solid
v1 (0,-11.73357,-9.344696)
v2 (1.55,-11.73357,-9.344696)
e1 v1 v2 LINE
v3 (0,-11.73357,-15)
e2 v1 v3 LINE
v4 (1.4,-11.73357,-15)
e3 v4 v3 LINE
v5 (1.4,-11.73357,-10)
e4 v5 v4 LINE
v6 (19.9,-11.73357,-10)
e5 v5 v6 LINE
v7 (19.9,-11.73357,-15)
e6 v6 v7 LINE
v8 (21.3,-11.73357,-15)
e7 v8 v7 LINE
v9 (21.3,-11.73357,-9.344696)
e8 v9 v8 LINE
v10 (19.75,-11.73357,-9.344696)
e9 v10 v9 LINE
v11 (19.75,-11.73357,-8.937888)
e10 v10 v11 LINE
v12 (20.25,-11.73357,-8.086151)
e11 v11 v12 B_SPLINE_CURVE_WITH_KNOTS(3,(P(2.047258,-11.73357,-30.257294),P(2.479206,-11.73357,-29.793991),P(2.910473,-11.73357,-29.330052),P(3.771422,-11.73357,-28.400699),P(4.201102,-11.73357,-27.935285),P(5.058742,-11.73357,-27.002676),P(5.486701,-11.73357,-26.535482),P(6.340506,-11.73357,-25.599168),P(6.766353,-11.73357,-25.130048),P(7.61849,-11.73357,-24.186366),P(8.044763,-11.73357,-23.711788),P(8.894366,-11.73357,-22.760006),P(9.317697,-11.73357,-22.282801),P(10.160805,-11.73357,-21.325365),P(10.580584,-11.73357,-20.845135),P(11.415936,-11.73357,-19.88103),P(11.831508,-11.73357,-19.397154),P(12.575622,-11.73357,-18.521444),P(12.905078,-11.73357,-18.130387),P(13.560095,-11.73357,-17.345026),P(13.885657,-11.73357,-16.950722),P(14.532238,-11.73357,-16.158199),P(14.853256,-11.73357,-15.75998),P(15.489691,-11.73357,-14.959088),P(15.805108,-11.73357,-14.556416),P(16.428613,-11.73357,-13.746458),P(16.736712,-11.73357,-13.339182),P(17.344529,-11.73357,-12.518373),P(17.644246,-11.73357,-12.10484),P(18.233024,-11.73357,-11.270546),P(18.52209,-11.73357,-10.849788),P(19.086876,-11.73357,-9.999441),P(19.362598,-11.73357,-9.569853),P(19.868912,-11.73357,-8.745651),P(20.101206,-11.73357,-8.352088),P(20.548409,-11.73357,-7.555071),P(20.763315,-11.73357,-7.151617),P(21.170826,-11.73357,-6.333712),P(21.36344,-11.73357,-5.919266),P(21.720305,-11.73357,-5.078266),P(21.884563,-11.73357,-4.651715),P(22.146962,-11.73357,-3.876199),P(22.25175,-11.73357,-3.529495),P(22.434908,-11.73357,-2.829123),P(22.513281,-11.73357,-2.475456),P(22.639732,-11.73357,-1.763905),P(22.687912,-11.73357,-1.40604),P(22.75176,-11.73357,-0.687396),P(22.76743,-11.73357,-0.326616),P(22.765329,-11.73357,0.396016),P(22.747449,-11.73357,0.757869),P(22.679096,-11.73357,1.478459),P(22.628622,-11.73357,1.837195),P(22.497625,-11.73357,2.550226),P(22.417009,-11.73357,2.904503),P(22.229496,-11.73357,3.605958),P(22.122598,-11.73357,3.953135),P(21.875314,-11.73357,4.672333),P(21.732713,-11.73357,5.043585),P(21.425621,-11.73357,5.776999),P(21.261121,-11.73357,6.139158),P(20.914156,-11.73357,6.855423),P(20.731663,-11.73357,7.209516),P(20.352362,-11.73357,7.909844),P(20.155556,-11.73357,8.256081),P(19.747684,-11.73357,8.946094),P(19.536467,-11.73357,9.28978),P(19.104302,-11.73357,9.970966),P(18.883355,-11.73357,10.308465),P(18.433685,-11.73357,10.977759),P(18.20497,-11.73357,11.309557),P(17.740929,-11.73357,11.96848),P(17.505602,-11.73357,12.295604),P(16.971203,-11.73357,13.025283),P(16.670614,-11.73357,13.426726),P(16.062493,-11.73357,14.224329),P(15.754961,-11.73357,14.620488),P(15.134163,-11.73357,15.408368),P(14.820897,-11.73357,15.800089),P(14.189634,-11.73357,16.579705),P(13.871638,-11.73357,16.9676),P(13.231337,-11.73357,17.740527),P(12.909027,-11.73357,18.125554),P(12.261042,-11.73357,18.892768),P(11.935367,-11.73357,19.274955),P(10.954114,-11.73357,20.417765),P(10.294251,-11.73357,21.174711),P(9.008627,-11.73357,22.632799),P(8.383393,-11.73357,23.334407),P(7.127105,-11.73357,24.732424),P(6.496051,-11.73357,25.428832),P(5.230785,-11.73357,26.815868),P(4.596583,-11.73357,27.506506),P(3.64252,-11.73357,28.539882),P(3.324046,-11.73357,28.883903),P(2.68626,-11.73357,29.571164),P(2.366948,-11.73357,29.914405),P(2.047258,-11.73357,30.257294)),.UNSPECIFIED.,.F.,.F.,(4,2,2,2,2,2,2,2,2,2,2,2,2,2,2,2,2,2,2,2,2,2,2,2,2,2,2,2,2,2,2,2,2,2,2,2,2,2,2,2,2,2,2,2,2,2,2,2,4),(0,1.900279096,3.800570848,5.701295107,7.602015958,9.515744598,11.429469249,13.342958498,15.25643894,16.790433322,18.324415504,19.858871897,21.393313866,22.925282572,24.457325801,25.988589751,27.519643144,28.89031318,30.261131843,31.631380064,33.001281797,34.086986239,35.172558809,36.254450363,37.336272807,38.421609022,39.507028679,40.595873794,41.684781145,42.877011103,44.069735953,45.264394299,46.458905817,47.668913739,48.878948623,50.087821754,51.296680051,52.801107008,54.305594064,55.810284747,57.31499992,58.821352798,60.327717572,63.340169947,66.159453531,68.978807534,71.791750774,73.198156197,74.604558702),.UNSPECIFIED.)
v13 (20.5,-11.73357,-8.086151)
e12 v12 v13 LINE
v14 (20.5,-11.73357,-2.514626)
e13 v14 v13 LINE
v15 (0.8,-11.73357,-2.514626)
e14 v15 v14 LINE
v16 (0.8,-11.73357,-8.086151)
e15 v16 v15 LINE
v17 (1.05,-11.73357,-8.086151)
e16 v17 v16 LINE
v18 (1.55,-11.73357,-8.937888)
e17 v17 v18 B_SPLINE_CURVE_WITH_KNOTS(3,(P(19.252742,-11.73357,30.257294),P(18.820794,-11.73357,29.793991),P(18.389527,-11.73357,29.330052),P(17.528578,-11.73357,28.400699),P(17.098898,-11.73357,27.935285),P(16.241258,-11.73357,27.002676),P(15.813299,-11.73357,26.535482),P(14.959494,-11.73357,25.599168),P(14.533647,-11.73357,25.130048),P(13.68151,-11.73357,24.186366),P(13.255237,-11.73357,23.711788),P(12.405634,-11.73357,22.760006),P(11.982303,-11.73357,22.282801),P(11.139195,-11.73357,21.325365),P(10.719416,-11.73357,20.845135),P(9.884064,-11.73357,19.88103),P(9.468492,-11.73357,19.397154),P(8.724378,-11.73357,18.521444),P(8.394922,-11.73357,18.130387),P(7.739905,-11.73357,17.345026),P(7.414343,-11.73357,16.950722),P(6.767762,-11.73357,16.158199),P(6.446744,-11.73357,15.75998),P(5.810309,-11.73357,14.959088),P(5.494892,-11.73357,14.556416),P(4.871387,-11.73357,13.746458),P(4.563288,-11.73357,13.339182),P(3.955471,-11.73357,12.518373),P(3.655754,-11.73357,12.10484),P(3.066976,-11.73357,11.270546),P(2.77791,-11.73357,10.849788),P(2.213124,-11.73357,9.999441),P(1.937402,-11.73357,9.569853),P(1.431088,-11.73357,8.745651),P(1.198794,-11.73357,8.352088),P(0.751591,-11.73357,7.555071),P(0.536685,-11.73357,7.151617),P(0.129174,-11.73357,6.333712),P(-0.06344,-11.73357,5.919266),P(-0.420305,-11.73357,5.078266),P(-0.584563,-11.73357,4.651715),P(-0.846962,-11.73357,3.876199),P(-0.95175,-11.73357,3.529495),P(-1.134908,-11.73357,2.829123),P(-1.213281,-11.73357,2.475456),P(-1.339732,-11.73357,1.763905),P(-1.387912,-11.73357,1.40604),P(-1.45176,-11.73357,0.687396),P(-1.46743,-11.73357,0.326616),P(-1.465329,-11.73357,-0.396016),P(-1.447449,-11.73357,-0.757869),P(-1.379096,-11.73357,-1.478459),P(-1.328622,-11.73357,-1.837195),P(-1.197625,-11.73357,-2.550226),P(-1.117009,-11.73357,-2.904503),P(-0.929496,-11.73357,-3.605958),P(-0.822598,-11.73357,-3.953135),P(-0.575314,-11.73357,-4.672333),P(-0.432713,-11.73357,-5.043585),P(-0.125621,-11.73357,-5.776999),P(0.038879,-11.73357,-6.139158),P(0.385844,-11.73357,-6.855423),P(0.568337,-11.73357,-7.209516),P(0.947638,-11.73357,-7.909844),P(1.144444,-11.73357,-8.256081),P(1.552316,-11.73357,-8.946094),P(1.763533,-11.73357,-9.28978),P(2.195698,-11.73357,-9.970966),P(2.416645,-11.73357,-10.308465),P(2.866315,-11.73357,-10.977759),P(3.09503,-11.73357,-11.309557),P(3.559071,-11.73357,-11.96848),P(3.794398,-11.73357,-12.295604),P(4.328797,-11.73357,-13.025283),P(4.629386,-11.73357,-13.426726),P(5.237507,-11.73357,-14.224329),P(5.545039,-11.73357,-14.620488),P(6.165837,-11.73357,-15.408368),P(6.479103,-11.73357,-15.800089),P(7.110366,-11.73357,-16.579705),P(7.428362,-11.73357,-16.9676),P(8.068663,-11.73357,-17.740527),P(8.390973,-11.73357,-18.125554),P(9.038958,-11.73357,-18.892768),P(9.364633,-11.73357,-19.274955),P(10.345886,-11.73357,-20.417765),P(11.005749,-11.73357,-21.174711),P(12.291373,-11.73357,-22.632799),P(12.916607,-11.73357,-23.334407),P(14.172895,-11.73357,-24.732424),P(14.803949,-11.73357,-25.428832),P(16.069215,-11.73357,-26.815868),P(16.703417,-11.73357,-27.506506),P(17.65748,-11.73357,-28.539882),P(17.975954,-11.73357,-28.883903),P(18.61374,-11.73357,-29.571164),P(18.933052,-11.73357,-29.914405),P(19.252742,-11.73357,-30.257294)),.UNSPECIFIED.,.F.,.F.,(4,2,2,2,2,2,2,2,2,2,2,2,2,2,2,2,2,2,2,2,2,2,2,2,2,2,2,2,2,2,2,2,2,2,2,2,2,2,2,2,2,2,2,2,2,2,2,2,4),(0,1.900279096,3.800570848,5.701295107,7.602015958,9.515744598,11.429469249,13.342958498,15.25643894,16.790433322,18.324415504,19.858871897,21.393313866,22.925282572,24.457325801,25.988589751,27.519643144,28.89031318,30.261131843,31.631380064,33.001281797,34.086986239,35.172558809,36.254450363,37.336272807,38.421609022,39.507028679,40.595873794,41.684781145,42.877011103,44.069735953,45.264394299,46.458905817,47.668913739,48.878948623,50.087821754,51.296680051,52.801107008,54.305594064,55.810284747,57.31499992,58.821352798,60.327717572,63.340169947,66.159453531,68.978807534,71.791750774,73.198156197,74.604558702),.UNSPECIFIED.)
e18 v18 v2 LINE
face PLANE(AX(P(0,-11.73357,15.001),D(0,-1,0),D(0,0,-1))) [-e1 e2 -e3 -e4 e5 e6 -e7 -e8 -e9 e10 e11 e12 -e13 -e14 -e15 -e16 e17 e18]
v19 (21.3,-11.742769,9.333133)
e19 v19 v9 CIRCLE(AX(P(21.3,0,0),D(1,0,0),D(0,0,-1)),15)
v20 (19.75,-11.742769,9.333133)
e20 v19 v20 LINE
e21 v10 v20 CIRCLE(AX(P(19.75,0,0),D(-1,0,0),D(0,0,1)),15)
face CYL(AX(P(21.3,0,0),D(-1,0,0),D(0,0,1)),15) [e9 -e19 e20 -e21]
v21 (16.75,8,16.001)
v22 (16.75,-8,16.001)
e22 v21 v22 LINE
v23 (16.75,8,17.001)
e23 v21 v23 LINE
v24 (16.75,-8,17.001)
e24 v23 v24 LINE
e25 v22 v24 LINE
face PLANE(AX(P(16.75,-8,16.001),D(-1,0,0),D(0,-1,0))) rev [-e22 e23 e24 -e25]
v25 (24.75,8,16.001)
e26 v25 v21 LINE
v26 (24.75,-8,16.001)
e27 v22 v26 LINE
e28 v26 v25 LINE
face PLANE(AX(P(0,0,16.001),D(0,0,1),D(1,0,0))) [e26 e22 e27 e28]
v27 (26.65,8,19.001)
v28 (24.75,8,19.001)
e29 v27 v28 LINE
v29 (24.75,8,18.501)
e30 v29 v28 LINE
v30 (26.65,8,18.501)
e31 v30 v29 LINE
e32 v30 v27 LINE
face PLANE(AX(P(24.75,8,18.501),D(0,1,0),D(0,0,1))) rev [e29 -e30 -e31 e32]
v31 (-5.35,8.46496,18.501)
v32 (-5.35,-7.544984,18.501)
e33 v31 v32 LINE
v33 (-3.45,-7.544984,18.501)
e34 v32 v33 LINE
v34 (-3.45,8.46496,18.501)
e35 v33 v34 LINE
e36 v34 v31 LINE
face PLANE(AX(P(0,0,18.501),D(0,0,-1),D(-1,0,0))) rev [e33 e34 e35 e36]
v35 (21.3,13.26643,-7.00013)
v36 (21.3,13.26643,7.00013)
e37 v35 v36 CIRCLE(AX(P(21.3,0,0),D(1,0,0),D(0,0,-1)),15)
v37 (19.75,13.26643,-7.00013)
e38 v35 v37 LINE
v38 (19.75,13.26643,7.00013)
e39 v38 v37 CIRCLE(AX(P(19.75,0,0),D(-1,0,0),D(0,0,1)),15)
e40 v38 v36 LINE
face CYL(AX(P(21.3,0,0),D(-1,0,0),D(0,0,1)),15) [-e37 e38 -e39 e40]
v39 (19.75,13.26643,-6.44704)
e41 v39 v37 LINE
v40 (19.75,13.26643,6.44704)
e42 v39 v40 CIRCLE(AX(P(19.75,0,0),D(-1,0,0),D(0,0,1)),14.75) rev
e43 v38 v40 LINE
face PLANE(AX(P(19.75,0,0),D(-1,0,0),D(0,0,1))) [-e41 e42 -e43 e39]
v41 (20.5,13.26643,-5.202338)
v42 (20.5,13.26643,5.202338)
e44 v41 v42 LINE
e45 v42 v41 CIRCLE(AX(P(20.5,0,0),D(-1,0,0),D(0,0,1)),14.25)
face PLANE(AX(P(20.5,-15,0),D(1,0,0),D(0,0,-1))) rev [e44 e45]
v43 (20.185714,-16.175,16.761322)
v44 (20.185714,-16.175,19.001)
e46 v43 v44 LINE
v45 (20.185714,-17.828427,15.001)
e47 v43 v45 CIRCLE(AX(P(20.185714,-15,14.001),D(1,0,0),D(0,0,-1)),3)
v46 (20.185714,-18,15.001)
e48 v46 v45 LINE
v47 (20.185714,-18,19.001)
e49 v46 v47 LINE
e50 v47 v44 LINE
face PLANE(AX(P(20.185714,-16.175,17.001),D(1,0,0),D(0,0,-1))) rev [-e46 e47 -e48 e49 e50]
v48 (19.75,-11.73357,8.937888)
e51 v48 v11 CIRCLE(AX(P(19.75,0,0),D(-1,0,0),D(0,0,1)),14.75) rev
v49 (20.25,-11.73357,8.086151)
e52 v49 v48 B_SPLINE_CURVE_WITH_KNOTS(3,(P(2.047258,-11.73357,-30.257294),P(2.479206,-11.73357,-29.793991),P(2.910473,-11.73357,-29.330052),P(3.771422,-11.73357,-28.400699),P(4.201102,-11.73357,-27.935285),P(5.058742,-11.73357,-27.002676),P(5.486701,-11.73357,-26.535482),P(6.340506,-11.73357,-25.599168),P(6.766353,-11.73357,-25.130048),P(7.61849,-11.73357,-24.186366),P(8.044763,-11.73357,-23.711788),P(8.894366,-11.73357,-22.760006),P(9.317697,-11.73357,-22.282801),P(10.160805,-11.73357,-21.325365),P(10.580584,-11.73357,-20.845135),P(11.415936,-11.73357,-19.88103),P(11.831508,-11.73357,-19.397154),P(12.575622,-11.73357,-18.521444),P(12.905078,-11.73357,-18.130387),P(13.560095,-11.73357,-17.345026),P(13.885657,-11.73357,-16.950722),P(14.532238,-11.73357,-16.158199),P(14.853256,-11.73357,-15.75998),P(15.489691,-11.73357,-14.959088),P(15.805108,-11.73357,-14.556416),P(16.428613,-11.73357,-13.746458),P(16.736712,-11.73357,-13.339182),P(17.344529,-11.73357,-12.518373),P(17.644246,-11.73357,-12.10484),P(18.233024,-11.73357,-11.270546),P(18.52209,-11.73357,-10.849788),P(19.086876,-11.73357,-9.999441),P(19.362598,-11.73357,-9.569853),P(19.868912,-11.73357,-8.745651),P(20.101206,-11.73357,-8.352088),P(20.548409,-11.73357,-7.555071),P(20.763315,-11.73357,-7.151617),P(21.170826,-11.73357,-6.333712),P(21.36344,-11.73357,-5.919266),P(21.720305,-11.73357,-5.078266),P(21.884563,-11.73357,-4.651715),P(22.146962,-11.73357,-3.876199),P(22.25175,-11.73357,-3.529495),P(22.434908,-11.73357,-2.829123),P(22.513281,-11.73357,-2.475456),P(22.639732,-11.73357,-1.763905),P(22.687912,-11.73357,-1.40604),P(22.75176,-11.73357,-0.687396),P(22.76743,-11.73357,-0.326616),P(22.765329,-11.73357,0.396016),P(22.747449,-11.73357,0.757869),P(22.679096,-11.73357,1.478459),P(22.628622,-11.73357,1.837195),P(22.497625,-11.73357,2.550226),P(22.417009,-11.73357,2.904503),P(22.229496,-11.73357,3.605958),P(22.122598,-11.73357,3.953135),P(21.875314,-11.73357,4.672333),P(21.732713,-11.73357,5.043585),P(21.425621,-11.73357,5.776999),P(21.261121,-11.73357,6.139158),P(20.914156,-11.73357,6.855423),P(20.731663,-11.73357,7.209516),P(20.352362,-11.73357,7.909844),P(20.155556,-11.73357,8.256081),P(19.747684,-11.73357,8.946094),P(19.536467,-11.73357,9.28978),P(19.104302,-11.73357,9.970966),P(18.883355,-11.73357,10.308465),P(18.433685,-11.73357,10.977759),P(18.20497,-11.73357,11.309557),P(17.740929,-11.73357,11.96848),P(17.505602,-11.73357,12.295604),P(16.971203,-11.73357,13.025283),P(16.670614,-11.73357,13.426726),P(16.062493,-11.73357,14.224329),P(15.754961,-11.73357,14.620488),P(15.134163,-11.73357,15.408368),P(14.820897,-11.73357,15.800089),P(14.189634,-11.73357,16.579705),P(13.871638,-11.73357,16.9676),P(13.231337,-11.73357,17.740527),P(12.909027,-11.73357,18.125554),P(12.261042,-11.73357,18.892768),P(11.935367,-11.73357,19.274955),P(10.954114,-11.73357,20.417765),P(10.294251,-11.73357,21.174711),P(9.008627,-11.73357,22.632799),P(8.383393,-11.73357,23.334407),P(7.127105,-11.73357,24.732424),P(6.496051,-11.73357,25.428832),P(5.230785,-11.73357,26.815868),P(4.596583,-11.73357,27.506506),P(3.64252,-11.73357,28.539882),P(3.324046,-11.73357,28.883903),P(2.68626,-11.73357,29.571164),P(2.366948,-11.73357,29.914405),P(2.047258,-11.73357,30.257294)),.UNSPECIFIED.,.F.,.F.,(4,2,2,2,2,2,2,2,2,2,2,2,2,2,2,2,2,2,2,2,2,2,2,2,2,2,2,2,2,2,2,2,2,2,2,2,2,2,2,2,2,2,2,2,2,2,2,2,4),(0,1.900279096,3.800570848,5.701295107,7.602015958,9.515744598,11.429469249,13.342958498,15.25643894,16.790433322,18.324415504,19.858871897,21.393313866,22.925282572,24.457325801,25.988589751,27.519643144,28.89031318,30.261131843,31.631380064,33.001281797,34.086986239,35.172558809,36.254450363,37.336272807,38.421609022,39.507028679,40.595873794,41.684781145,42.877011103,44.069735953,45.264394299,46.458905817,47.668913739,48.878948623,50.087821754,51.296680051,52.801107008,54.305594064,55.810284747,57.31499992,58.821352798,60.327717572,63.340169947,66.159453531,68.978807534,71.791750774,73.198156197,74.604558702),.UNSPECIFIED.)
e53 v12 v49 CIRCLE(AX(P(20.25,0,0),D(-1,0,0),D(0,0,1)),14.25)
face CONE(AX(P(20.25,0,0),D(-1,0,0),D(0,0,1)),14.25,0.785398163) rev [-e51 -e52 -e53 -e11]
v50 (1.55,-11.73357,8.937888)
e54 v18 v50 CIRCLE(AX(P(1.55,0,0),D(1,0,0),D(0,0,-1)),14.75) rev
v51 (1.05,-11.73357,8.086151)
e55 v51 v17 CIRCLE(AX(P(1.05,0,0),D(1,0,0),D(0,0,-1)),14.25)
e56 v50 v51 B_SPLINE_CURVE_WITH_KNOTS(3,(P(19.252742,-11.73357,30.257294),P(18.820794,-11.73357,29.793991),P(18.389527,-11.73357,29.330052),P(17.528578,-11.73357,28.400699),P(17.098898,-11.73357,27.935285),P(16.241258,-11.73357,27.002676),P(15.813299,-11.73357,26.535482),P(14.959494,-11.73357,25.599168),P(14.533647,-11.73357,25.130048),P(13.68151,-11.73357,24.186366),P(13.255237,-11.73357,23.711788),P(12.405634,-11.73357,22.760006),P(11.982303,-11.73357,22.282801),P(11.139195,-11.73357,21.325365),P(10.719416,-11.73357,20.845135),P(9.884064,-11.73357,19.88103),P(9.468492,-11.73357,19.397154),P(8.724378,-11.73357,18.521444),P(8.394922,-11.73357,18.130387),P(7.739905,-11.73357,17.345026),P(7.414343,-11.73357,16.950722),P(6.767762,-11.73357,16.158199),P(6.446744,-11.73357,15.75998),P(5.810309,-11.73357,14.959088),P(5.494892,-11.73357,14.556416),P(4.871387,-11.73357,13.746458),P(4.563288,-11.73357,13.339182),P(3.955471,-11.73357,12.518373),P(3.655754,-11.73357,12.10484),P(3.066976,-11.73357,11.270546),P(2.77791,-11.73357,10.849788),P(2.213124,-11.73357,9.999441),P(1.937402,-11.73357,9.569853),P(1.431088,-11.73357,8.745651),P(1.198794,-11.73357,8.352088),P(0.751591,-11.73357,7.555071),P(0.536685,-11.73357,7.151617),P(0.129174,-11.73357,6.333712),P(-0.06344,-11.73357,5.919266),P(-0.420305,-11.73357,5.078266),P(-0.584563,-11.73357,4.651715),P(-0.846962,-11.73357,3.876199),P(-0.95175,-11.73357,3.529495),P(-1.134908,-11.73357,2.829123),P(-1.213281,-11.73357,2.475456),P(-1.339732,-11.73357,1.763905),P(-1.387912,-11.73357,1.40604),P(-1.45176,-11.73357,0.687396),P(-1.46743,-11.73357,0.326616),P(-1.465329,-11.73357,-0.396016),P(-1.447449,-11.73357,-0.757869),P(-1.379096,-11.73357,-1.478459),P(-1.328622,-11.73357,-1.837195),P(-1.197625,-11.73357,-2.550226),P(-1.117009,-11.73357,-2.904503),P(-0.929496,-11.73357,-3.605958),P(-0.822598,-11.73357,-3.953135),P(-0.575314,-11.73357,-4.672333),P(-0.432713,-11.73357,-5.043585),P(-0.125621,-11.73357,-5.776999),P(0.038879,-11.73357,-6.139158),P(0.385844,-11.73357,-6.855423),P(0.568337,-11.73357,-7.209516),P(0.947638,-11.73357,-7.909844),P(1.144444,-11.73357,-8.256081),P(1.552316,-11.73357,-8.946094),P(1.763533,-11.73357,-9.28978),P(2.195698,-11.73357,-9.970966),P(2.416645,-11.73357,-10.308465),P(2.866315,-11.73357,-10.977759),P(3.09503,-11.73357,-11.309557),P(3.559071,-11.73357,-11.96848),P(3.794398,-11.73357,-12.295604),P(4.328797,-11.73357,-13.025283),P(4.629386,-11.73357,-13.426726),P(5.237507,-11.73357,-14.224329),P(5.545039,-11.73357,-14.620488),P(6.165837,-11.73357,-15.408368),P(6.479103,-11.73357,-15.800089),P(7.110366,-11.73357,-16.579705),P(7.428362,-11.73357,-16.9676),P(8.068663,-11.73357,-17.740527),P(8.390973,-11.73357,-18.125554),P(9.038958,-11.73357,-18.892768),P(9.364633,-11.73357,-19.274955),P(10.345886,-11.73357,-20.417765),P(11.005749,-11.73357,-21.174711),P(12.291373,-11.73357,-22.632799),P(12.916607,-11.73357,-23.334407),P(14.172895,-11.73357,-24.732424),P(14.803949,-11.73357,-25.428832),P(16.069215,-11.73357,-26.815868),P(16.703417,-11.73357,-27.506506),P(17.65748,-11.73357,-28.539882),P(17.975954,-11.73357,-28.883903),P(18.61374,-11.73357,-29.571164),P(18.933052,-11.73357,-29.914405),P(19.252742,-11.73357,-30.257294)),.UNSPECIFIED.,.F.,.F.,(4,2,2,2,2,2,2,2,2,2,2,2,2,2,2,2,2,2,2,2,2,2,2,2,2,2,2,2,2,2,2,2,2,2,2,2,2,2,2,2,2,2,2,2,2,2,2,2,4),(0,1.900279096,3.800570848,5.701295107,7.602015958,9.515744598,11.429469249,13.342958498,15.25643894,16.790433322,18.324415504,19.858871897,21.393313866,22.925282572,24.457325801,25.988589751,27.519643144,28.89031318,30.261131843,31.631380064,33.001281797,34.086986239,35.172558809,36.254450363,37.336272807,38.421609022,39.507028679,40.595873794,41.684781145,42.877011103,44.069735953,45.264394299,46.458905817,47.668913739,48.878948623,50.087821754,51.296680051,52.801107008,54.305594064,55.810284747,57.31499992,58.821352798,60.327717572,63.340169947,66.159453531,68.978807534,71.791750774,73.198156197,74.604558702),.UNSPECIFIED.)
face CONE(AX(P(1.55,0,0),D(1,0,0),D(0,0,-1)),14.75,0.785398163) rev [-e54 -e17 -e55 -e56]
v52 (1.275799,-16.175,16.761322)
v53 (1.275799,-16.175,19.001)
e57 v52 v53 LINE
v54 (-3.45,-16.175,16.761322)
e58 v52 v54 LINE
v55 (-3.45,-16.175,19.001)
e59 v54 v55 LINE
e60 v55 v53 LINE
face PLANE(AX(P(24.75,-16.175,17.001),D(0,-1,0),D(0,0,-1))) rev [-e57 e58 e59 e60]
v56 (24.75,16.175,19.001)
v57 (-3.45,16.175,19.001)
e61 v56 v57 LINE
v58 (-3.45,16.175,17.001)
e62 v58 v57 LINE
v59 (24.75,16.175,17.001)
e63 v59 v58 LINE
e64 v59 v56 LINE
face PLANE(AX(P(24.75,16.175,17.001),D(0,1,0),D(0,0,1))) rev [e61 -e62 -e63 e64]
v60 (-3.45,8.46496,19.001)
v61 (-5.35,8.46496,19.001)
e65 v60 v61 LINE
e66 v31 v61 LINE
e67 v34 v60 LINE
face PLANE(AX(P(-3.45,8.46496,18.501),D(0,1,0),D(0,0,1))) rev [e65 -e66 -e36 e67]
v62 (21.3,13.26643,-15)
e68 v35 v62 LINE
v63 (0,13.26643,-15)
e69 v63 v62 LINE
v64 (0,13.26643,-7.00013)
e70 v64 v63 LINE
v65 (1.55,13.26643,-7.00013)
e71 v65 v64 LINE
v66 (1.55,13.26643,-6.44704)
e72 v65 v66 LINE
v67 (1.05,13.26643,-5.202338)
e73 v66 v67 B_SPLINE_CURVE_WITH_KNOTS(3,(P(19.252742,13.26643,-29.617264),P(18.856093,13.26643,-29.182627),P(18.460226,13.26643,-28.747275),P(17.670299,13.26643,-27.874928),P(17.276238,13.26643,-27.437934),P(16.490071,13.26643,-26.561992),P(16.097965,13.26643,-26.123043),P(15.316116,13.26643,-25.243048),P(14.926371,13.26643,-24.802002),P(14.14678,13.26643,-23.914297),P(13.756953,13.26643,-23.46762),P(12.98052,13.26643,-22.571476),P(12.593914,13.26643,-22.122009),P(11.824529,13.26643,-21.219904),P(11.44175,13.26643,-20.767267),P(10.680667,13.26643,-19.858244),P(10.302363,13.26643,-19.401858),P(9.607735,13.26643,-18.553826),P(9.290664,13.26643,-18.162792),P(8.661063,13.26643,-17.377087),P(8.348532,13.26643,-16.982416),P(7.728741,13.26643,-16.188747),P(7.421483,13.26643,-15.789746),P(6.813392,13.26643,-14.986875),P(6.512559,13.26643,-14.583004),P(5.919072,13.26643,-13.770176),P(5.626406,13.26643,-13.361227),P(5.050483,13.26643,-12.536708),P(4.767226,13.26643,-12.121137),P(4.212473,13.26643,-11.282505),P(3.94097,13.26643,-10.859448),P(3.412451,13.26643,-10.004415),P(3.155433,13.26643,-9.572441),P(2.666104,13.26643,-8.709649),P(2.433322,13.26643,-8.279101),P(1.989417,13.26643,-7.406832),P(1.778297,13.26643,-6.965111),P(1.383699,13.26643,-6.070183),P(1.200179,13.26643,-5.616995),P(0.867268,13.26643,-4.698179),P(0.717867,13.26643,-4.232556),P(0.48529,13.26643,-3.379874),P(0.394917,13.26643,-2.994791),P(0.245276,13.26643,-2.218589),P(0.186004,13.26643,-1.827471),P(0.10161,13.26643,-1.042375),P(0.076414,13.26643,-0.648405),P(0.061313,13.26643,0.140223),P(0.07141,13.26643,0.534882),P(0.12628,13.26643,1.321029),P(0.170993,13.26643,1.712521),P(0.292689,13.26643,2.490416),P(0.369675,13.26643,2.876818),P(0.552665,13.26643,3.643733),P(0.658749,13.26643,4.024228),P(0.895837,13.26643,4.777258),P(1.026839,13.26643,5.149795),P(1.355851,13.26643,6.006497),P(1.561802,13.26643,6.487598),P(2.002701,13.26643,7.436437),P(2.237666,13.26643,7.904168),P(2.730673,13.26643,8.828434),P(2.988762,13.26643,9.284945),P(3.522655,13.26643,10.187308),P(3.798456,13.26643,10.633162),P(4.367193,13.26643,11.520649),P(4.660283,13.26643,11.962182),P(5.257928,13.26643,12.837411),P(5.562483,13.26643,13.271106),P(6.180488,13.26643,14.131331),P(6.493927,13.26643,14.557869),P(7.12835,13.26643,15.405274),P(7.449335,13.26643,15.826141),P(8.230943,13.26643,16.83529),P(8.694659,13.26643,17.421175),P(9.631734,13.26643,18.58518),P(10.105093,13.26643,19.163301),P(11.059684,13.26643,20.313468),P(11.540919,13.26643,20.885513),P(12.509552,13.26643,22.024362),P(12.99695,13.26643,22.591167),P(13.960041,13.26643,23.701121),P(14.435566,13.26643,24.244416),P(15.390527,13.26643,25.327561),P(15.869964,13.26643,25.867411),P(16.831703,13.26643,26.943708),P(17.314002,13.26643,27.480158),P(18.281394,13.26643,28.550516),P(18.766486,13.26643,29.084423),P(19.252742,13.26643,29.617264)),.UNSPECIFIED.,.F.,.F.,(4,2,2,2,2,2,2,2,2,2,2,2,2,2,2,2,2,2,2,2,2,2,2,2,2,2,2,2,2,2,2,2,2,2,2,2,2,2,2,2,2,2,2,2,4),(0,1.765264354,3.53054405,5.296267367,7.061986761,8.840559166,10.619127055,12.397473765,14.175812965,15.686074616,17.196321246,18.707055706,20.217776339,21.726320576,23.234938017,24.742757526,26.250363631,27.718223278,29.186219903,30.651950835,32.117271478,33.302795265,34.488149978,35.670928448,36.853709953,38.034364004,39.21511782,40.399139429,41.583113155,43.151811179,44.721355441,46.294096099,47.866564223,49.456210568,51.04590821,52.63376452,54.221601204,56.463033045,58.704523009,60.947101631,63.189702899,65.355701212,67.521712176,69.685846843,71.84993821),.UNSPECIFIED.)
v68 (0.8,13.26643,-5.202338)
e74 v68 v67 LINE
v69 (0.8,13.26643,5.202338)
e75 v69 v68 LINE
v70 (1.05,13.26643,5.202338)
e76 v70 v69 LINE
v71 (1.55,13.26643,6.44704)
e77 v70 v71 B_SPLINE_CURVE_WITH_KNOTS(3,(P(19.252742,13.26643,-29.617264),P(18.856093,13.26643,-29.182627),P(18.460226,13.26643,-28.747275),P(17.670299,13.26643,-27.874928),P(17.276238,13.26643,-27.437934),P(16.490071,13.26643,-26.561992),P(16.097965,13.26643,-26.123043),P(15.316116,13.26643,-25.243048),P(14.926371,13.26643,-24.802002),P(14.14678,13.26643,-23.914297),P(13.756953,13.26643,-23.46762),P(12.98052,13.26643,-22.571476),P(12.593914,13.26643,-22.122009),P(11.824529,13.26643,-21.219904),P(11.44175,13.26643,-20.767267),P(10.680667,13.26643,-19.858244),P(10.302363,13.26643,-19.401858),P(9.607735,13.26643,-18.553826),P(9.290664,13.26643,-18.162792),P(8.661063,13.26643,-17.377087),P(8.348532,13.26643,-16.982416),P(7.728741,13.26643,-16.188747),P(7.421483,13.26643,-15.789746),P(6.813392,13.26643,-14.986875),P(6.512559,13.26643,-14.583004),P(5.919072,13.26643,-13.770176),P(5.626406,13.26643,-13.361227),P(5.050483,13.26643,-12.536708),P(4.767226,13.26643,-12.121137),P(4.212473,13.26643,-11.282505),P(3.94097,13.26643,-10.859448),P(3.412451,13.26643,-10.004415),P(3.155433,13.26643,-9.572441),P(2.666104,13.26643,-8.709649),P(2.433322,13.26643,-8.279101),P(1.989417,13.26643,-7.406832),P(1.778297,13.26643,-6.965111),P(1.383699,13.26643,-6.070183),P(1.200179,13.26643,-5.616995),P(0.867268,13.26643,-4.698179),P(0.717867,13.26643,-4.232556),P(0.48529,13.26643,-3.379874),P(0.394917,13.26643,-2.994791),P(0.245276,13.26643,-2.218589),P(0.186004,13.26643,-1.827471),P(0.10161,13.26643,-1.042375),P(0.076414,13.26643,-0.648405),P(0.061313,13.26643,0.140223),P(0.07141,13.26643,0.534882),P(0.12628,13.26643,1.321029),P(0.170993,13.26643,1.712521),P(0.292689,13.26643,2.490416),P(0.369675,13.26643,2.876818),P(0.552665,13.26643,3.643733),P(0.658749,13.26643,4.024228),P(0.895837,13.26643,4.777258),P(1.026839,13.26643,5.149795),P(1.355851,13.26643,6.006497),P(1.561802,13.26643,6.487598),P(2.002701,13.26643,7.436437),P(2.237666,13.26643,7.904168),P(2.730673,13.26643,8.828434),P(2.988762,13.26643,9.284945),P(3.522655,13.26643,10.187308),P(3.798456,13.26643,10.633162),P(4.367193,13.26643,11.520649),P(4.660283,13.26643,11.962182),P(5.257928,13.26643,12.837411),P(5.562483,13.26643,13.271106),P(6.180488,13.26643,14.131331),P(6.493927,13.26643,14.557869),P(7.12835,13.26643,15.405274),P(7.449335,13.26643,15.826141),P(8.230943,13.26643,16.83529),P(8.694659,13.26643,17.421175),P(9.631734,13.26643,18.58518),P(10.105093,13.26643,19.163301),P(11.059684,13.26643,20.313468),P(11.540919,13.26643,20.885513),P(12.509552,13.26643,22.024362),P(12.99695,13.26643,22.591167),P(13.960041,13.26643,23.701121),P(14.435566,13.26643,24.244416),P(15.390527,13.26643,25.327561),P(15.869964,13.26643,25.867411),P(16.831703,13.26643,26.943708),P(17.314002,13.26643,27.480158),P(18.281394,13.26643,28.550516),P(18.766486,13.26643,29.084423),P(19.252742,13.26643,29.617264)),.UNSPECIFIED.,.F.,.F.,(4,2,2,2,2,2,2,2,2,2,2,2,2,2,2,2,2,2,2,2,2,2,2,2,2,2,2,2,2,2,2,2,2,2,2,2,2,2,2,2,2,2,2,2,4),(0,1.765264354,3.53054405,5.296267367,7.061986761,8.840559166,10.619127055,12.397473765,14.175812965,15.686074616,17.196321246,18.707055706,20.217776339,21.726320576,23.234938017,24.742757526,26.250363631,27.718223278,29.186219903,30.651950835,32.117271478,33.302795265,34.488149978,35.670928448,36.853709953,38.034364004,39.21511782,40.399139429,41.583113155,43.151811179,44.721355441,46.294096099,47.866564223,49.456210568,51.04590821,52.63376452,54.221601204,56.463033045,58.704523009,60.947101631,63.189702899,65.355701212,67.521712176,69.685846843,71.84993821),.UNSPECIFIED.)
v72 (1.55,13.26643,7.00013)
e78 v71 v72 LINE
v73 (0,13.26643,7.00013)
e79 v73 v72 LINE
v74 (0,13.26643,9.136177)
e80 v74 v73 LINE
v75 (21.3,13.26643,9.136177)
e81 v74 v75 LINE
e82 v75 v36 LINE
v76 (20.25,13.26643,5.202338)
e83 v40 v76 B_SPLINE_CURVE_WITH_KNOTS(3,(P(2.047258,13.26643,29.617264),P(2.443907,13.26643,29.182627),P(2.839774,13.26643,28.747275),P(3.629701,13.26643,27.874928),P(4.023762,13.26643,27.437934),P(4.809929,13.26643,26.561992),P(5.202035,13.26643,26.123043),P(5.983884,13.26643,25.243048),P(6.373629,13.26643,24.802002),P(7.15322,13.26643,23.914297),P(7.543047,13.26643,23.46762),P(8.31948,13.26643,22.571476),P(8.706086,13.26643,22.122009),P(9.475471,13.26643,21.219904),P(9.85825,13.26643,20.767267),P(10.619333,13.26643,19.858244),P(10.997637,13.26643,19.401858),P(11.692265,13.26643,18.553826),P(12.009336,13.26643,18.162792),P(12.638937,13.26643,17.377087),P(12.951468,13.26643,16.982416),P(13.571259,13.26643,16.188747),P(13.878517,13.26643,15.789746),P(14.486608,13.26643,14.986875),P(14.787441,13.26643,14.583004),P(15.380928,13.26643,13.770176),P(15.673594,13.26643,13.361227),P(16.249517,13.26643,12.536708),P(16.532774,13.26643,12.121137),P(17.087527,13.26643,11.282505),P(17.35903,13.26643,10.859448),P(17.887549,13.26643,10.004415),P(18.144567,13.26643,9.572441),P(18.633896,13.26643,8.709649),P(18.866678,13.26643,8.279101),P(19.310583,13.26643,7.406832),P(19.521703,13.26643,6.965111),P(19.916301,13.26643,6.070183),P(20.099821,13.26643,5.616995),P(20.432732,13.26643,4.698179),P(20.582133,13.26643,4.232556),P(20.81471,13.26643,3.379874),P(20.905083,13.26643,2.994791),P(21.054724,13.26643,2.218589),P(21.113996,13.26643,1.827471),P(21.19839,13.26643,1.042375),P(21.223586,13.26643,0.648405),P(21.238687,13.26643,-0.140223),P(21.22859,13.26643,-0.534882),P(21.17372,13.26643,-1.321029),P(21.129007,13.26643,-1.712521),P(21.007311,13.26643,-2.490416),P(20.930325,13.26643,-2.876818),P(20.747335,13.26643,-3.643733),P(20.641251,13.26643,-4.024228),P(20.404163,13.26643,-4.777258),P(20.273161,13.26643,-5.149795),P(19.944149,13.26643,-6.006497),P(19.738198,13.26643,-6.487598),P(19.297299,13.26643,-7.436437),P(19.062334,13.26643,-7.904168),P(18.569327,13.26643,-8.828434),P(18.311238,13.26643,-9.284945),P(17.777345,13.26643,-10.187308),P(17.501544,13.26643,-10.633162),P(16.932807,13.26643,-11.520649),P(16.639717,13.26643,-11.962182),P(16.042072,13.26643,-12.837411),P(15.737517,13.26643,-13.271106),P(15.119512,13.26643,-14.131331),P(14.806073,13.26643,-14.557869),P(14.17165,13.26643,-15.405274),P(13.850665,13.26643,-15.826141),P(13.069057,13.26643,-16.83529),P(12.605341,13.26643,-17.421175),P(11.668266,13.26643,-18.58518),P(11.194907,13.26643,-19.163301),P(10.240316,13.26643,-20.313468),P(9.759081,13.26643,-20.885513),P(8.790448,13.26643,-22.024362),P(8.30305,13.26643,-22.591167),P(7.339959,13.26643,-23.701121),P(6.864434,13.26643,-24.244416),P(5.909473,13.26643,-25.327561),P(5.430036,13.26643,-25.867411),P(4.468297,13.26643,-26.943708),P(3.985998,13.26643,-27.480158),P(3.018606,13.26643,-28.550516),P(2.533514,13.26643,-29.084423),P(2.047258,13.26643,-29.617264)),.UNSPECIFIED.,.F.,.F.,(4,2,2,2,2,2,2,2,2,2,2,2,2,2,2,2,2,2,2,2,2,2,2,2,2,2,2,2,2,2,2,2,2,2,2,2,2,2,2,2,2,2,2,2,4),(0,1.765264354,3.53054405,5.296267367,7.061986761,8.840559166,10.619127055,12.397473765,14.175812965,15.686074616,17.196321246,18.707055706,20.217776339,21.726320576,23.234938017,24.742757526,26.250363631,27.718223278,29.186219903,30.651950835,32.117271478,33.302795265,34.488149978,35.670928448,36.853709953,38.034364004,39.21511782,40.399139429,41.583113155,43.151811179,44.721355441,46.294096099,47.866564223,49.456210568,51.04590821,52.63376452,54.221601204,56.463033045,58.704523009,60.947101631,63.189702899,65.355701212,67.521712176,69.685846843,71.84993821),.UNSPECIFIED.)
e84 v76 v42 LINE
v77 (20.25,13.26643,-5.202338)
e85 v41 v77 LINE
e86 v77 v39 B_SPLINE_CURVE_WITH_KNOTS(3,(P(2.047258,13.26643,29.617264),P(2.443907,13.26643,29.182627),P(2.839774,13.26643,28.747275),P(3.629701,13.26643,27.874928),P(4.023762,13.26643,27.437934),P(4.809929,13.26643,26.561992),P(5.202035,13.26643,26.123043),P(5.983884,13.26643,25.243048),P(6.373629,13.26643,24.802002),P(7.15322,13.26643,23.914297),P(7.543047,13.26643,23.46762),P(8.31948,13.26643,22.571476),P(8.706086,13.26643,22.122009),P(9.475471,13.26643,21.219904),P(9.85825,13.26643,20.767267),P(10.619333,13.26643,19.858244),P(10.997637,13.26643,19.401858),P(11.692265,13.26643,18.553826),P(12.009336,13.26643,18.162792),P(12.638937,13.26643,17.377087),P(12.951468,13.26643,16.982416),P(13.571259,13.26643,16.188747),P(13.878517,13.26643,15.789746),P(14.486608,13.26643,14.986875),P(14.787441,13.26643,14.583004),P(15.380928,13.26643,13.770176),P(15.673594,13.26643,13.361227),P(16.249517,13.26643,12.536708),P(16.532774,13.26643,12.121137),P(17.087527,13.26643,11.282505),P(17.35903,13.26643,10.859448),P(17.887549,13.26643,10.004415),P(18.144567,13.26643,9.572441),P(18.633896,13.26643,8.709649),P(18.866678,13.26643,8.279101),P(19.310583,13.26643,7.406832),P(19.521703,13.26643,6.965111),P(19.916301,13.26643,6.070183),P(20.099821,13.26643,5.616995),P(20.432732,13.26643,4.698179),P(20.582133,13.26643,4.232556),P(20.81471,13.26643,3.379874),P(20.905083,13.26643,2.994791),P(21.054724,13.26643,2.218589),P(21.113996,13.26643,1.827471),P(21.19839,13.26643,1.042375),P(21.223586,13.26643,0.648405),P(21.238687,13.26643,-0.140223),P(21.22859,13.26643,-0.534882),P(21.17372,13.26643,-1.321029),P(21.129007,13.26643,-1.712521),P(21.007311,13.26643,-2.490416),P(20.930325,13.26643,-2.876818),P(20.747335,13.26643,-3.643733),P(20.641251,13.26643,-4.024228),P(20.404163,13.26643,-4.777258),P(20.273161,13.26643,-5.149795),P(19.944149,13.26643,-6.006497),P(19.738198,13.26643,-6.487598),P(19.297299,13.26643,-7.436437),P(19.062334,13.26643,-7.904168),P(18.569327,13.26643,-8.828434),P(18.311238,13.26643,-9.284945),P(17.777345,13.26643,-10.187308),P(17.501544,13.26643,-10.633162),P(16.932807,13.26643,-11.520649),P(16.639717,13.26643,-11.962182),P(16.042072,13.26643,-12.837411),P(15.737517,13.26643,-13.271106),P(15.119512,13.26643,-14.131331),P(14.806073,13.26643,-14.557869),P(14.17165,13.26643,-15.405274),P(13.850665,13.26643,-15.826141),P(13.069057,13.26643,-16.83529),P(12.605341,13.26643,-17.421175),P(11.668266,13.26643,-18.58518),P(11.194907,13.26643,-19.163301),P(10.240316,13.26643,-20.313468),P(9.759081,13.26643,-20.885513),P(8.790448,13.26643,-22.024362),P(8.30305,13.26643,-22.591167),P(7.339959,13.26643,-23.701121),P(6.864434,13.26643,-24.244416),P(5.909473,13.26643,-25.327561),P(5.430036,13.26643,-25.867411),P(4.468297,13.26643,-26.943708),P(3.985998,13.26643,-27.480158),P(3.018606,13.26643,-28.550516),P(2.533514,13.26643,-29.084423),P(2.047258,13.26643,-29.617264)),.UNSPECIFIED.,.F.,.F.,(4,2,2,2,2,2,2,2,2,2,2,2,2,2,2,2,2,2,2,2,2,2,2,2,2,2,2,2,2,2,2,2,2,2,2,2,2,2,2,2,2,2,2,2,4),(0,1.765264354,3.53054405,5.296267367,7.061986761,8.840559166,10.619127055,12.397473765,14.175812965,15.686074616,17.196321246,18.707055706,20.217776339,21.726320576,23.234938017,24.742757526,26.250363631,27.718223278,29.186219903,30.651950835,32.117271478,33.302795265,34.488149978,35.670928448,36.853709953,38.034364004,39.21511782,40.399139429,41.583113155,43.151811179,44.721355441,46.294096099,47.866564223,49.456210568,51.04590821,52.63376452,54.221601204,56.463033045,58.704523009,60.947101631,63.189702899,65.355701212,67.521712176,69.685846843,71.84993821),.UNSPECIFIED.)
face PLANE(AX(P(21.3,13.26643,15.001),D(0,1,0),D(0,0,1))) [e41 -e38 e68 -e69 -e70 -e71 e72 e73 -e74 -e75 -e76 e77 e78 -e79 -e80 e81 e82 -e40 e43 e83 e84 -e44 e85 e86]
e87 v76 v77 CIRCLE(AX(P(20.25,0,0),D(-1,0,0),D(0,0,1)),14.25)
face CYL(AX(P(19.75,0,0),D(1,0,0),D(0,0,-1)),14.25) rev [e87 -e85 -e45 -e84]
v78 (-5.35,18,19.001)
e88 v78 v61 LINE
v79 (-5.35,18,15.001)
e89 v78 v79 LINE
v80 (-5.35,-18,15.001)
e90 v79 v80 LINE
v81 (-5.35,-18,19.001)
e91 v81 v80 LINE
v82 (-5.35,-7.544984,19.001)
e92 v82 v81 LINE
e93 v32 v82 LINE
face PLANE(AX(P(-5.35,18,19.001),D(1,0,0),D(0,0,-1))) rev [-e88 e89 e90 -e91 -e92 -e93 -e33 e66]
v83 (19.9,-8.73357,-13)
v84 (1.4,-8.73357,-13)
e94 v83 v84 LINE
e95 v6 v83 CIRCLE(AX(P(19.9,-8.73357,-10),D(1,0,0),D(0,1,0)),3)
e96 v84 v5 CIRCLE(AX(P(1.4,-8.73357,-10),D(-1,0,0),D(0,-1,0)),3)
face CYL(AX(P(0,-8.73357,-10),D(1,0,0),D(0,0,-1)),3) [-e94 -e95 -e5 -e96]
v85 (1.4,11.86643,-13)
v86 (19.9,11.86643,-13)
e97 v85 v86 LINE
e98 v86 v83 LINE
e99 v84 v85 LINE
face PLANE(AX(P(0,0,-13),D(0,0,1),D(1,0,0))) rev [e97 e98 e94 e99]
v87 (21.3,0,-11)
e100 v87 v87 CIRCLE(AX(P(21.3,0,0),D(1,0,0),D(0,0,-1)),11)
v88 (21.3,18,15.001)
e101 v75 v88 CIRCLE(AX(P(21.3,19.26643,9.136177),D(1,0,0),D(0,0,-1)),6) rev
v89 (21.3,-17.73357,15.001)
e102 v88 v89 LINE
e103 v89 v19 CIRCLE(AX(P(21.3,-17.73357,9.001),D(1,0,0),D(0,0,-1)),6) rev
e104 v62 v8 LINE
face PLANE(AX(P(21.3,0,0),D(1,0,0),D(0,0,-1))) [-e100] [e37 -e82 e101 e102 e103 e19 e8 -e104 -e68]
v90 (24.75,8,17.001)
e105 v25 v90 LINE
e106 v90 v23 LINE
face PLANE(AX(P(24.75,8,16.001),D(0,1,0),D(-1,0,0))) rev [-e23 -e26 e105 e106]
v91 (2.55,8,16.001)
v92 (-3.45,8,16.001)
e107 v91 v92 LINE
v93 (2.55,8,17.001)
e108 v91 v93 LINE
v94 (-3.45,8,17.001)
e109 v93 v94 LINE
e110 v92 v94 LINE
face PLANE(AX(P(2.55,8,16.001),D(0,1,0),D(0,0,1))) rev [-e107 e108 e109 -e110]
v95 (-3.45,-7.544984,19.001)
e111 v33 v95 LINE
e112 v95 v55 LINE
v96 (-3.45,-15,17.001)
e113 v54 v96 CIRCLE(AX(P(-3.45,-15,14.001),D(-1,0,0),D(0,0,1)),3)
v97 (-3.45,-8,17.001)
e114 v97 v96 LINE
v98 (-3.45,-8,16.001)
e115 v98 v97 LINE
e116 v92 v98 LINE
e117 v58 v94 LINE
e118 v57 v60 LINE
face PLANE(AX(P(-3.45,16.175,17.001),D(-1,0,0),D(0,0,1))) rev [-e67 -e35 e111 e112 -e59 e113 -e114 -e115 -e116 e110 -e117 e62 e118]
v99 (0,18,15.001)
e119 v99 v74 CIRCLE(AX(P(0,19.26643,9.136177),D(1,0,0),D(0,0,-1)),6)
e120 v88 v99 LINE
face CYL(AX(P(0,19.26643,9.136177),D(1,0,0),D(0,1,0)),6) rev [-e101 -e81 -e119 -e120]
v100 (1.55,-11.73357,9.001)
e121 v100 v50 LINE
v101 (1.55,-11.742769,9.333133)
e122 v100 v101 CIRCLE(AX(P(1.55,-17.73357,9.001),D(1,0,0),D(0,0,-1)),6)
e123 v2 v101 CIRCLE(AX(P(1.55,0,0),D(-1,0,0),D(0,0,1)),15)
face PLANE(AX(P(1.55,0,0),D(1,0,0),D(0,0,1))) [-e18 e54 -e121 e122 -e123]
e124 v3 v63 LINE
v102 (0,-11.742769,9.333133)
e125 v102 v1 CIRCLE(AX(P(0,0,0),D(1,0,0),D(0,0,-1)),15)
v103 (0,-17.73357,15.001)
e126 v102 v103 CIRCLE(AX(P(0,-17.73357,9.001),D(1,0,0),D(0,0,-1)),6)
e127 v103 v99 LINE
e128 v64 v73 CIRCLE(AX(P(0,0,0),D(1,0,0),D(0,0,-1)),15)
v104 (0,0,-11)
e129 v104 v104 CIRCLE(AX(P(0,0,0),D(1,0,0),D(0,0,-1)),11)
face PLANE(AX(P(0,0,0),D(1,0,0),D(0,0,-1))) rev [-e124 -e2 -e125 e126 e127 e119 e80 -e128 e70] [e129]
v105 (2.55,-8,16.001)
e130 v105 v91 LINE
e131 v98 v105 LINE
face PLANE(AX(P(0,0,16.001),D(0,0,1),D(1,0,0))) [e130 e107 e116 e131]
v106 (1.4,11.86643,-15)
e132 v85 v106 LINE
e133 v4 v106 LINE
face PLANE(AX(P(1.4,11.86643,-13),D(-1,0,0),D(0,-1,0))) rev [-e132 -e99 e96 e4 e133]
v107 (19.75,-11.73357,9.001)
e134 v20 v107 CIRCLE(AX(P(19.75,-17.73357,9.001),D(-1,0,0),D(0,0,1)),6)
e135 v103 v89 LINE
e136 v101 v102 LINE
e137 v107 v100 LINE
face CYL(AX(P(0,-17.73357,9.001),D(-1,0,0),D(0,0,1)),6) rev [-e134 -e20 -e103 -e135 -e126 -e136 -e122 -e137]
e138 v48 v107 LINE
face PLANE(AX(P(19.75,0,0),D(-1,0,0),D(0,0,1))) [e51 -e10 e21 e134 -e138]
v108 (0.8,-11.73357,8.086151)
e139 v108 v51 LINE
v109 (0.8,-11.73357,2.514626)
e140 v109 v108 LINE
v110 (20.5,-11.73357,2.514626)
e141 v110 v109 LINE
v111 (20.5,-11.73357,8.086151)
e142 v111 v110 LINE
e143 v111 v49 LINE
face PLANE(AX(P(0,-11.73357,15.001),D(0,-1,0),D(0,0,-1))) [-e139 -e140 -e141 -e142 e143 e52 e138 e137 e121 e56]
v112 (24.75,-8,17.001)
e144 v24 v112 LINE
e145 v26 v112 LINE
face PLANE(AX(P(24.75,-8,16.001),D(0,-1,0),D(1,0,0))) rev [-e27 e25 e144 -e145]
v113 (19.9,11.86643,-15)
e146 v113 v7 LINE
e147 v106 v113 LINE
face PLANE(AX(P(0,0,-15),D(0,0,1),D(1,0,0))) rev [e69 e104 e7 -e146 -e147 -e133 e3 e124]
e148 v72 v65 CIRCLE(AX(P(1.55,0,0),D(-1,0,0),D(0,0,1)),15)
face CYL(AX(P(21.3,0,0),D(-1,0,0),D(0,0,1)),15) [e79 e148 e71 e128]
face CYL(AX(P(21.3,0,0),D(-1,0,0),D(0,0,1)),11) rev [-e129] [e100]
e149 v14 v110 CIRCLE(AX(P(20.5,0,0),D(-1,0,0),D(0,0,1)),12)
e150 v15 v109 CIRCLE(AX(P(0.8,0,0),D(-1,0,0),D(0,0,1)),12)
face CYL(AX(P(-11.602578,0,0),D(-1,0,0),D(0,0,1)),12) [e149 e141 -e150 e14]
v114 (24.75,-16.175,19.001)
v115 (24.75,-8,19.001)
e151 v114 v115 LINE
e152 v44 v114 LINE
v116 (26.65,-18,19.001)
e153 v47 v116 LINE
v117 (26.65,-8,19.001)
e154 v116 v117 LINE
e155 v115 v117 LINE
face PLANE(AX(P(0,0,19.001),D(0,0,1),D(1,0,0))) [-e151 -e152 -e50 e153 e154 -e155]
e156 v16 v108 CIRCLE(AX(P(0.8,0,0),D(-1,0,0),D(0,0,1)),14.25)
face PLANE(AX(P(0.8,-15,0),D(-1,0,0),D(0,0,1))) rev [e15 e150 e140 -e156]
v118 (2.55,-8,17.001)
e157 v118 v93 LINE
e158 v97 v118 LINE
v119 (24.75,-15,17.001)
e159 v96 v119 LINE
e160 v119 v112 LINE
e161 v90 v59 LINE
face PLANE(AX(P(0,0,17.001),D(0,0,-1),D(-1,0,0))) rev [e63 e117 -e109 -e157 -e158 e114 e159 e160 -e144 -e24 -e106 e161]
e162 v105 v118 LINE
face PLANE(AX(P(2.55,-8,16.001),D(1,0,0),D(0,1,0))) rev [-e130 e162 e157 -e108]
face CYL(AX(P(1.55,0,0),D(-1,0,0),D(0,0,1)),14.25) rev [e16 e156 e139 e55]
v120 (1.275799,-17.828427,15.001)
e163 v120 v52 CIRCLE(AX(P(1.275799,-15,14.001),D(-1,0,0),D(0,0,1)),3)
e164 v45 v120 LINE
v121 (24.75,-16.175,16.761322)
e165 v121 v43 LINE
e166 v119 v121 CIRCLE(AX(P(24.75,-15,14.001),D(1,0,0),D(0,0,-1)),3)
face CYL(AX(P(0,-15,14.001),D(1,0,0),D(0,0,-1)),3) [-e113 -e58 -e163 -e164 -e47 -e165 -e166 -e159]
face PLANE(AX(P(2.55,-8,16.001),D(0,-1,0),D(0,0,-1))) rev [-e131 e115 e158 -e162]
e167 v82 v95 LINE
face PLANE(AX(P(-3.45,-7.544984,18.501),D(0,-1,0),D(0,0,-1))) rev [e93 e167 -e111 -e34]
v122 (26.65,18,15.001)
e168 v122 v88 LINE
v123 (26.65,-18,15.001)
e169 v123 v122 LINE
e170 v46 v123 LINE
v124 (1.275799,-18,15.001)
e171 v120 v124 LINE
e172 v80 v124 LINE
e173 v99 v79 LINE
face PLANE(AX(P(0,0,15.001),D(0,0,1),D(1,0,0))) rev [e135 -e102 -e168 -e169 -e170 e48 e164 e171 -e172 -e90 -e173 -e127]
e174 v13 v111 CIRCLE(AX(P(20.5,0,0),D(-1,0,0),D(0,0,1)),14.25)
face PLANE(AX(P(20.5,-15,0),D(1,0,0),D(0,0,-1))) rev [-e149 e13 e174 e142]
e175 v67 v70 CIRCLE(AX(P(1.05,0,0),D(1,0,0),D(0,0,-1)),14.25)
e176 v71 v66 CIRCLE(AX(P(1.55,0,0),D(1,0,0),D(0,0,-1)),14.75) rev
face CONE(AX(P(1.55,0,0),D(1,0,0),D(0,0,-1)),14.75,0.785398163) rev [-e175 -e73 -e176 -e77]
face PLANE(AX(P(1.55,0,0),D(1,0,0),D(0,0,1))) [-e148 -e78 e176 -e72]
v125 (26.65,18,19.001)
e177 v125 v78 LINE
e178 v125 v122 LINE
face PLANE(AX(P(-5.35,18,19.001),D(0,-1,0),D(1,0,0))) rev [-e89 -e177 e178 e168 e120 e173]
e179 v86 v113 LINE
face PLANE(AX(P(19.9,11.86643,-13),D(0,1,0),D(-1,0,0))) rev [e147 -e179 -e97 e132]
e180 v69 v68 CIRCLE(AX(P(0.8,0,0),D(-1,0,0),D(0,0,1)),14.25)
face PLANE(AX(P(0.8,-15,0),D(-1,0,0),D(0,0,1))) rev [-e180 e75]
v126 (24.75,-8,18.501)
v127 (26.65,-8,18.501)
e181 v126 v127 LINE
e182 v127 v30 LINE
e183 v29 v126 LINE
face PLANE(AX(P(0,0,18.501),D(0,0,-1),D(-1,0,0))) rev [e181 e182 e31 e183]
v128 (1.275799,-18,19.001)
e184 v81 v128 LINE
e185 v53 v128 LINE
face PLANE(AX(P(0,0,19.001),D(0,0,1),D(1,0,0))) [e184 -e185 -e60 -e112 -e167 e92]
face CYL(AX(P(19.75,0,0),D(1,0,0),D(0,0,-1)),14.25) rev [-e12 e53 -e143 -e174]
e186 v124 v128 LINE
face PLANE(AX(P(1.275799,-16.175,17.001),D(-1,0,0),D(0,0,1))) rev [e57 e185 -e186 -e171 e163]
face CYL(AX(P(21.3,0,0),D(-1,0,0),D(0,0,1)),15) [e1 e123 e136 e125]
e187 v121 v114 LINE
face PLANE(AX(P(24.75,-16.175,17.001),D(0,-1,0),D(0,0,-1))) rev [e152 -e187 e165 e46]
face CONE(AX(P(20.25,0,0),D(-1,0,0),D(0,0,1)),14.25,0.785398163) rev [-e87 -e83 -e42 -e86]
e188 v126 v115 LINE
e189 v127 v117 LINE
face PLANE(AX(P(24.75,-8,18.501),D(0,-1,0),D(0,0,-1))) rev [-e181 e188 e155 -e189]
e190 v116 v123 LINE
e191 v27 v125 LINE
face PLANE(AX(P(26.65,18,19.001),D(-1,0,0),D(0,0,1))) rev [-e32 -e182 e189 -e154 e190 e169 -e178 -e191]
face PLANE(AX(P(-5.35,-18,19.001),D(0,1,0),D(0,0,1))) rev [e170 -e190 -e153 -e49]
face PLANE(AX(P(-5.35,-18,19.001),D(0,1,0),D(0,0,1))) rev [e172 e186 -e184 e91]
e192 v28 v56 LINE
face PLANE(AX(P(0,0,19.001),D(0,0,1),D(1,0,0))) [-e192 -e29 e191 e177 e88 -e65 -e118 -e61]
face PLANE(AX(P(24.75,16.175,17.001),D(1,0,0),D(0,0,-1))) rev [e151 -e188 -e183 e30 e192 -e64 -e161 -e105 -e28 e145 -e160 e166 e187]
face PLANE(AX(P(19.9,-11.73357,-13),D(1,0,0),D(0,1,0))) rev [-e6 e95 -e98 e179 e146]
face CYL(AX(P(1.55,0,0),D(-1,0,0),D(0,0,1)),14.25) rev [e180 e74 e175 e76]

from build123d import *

# Parameters (mm, degrees)
SKETCH6_R                = 15
SKETCH6_R_2              = 11
BOSS_EXTRUDE2_DEPTH      = 21.3
SKETCH4_W                = 19.7
SKETCH4_H                = 3
BOSS_EXTRUDE3_REACH      = 38.107
SKETCH9_W                = 21.3
SKETCH9_H                = 9.16515139
BOSS_EXTRUDE4_START      = 0.75
SKETCH10_R               = 15
SKETCH10_R_2             = 14.25
BOSS_EXTRUDE4_DEPTH      = 0.75
CHAMFER1_SIZE            = 0.5
CHAMFER1_OF_MIRROR1_SIZE = 0.5
BOSS_EXTRUDE6_DEPTH      = 21.3
SKETCH17_W               = 18.5
SKETCH17_H               = 23.6
CUT_EXTRUDE3_DEPTH       = 2
SKETCH14_R               = 11
CUT_EXTRUDE2_DEPTH       = 31.061936082
SKETCH18_W               = 32
SKETCH18_H               = 36
BOSS_EXTRUDE7_DEPTH      = 4
SKETCH19_W               = 28.2
SKETCH19_H               = 32.35
CUT_EXTRUDE4_DEPTH       = 2
SKETCH20_W               = 6
SKETCH20_H               = 16
SKETCH20_W_2             = 8
CUT_EXTRUDE5_DEPTH       = 1
SKETCH21_W               = 1.9
SKETCH21_H               = 16
SKETCH21_H_2             = 16.00994424
CUT_EXTRUDE6_DEPTH       = 0.5
SKETCH22_W               = 18.909915591
SKETCH22_H               = 1.825
CUT_EXTRUDE7_DEPTH       = 2
FILLET1_R                = 6
FILLET2_R                = 3


# Read off the part's stored shape, not the designer's step: Boss-Extrude6
with BuildPart() as part:
    # Sketch6 → Boss-Extrude2 (new body)
    with BuildSketch(Plane(origin=(0, 0, 0), x_dir=(0, 0, -1), z_dir=(1, 0, 0))):
        Circle(SKETCH6_R)
        Circle(SKETCH6_R_2, mode=Mode.SUBTRACT)
    extrude(amount=BOSS_EXTRUDE2_DEPTH)

    # Sketch4 → Cut-Revolve1 (revolve, cut)
    with BuildSketch(Plane.XY, mode=Mode.PRIVATE) as cut_revolve1_sk:
        with Locations((10.65, -13.5)):
            Rectangle(SKETCH4_W, SKETCH4_H)
    revolve(cut_revolve1_sk.sketch.rotate(Axis((-11.602577702, 0, 0), (1, 0, 0)), 270), axis=Axis((-11.602577702, 0, 0), (1, 0, 0)), mode=Mode.SUBTRACT)

    # Sketch9 → Boss-Extrude3 (add, up to next)
    with BuildSketch(Plane.XY.offset(-10), mode=Mode.PRIVATE) as boss_extrude3_sk1:
        with Locations((10.65, 0)):
            Rectangle(SKETCH9_W, SKETCH9_H)
    boss_extrude3_tool1 = extrude(boss_extrude3_sk1.sketch, amount=-BOSS_EXTRUDE3_REACH, mode=Mode.PRIVATE) - part.part
    add(boss_extrude3_tool1.solids().sort_by_distance((10.65, 0, -10))[0])

    # Sketch10 → Boss-Extrude4 (add)
    with BuildSketch(Plane.ZY.offset(-20.5).offset(BOSS_EXTRUDE4_START)):
        Circle(SKETCH10_R)
        Circle(SKETCH10_R_2, mode=Mode.SUBTRACT)
    boss_extrude4 = extrude(amount=-BOSS_EXTRUDE4_DEPTH)

    # Chamfer1
    chamfer1_edges = [part.edges().sort_by_distance(p)[0] for p in [
        (19.75, 0, -14.25),
    ]]
    chamfer(chamfer1_edges, length=CHAMFER1_SIZE)

    # Mirror1: Boss-Extrude4 across plane
    add(boss_extrude4.mirror(Plane.ZY.offset(-10.65)))

    # Chamfer1 of Mirror1
    chamfer1_of_mirror1_edges = [part.edges().sort_by_distance(p)[0] for p in [
        (1.55, 0, -14.25),
    ]]
    chamfer(chamfer1_of_mirror1_edges, length=CHAMFER1_OF_MIRROR1_SIZE)

    # Boss-Extrude6 outline → Boss-Extrude6 (add)
    with BuildSketch(Plane.YZ):
        with BuildLine():
            Line((13.266430469, -15), (13.266430469, 15.001))
            Line((13.266430469, 15.001), (-11.733569531, 15.001))
            Line((-11.733569531, 15.001), (-11.733569531, 2.514626428))
            ThreePointArc((-11.733569531, 2.514626428), (12, 0), (-11.733569531, -2.514626428))
            Line((-11.733569531, -2.514626428), (-11.733569531, -15))
            Line((-11.733569531, -15), (13.266430469, -15))
        make_face()
    extrude(amount=BOSS_EXTRUDE6_DEPTH)

    # Sketch17 → Cut-Extrude3 (cut)
    with BuildSketch(Plane(origin=(0, 0, -15), x_dir=(-1, 0, 0), z_dir=(0, 0, -1))):
        with Locations((-10.65, 0.066430469)):
            Rectangle(SKETCH17_W, SKETCH17_H)
    extrude(amount=-CUT_EXTRUDE3_DEPTH, mode=Mode.SUBTRACT)

    # Sketch14 → Cut-Extrude2 (cut, through all)
    with BuildSketch(Plane(origin=(21.3, 0, 0), x_dir=(0, 0, -1), z_dir=(1, 0, 0))):
        Circle(SKETCH14_R)
    extrude(amount=-CUT_EXTRUDE2_DEPTH, mode=Mode.SUBTRACT)

    # Sketch18 → Boss-Extrude7 (add)
    with BuildSketch(Plane.XY.offset(15.001)):
        with Locations((10.65, 0)):
            Rectangle(SKETCH18_W, SKETCH18_H)
    extrude(amount=BOSS_EXTRUDE7_DEPTH)

    # Sketch19 → Cut-Extrude4 (cut)
    with BuildSketch(Plane.XY.offset(19.001)):
        with Locations((10.65, 0)):
            Rectangle(SKETCH19_W, SKETCH19_H)
    extrude(amount=-CUT_EXTRUDE4_DEPTH, mode=Mode.SUBTRACT)

    # Sketch20 → Cut-Extrude5 (cut)
    with BuildSketch(Plane.XY.offset(17.001)):
        with Locations((-0.45, 0)):
            Rectangle(SKETCH20_W, SKETCH20_H)
        with Locations((20.75, 0)):
            Rectangle(SKETCH20_W_2, SKETCH20_H)
    extrude(amount=-CUT_EXTRUDE5_DEPTH, mode=Mode.SUBTRACT)

    # Sketch21 → Cut-Extrude6 (cut)
    with BuildSketch(Plane.XY.offset(19.001)):
        with Locations((25.7, 0)):
            Rectangle(SKETCH21_W, SKETCH21_H)
        with Locations((-4.4, 0.459988306)):
            Rectangle(SKETCH21_W, SKETCH21_H_2)
    extrude(amount=-CUT_EXTRUDE6_DEPTH, mode=Mode.SUBTRACT)

    # Sketch22 → Cut-Extrude7 (cut)
    with BuildSketch(Plane.XY.offset(19.001)):
        with Locations((10.730756322, -17.0875)):
            Rectangle(SKETCH22_W, SKETCH22_H)
    extrude(amount=-CUT_EXTRUDE7_DEPTH, mode=Mode.SUBTRACT)

    # Fillet1
    # the kernel refuses this fillet: 6 mm, written as the material it adds along each edge
    with BuildSketch(Plane(origin=(0, -11.733569531, 15.001), x_dir=(0, -1, 0), z_dir=(1, 0, 0))) as fillet1_piece_1:
        with BuildLine():
            CenterArc((FILLET1_R, FILLET1_R), FILLET1_R, 180, 90)
            Line((0, FILLET1_R), (-FILLET1_R * 0.02, FILLET1_R))
            Line((-FILLET1_R * 0.02, FILLET1_R), (-FILLET1_R * 0.02, -FILLET1_R * 0.02))
            Line((-FILLET1_R * 0.02, -FILLET1_R * 0.02), (FILLET1_R, -FILLET1_R * 0.02))
            Line((FILLET1_R, -FILLET1_R * 0.02), (FILLET1_R, 0))
        make_face()
    extrude(amount=21.3)
    with BuildSketch(Plane(origin=(0, 13.266430469, 15.001), x_dir=(0, 1, 0), z_dir=(1, 0, 0))) as fillet1_piece_2:
        with BuildLine():
            CenterArc((6, -5.86482343), FILLET1_R, 102.185166617, 77.814833383)
            Line((0, -5.86482343), (-0.12, -5.86482343))
            Line((-0.12, -5.86482343), (-0.12, 0))
            Line((-0.12, 0), (0, 0.12))
            ThreePointArc((0, 0.12), (2.366784766, 0.12), (4.708240922, 0.117296469))
            Line((4.708240922, 0.117296469), (4.733569531, 0))
        make_face()
    extrude(amount=21.3)

    # Fillet2
    # the kernel refuses this fillet: 3 mm, written as the material it takes off along each edge
    with BuildSketch(Plane(origin=(1.4, -11.733569531, -13), x_dir=(0, -1.6111438109570978e-10, 1.0), z_dir=(1, 0, 0))) as fillet2_piece_1:
        with BuildLine():
            CenterArc((FILLET2_R, -FILLET2_R), FILLET2_R, 89.999999991, 90)
            Line((-FILLET2_R * 1.6111438107e-10, -FILLET2_R), (0, 0))
            Line((0, 0), (FILLET2_R, 0))
        make_face()
    extrude(amount=18.5, mode=Mode.SUBTRACT)
    with BuildSketch(Plane(origin=(27.685714118, -18, 17.001), x_dir=(0, 0, -1), z_dir=(-1, 0, 0))) as fillet2_piece_2_section:
        with BuildLine():
            CenterArc((FILLET2_R, -FILLET2_R), FILLET2_R, 90, 90)
            Line((0, -FILLET2_R), (0, 0))
            Line((0, 0), (FILLET2_R, 0))
        make_face()
    fillet2_piece_2 = extrude(amount=33.90991559, mode=Mode.PRIVATE)
    fillet2_piece_2 = split(fillet2_piece_2, bisect_by=Plane(origin=(22.467857059, -16.175, 16.929617158), z_dir=(0, 1, 0)), keep=Keep.TOP, mode=Mode.PRIVATE)
    fillet2_piece_2 = split(fillet2_piece_2, bisect_by=Plane(origin=(24.75, -15.883648186, 16.929617158), z_dir=(-1, 0, 0)), keep=Keep.TOP, mode=Mode.PRIVATE)
    fillet2_piece_2 = split(fillet2_piece_2, bisect_by=Plane(origin=(-3.45, -15.883648186, 16.929617158), z_dir=(1, 0, 0)), keep=Keep.TOP, mode=Mode.PRIVATE)
    add(fillet2_piece_2, mode=Mode.SUBTRACT)
    with BuildSketch(Plane(origin=(20.185714118, -18, 17.001), x_dir=(0, 0, -1), z_dir=(-1, 0, 0))) as fillet2_piece_3:
        with BuildLine():
            CenterArc((FILLET2_R, -FILLET2_R), FILLET2_R, 90, 90)
            Line((0, -FILLET2_R), (0, 0))
            Line((0, 0), (FILLET2_R, 0))
        make_face()
    extrude(amount=18.90991559, mode=Mode.SUBTRACT)


solid = part.part
